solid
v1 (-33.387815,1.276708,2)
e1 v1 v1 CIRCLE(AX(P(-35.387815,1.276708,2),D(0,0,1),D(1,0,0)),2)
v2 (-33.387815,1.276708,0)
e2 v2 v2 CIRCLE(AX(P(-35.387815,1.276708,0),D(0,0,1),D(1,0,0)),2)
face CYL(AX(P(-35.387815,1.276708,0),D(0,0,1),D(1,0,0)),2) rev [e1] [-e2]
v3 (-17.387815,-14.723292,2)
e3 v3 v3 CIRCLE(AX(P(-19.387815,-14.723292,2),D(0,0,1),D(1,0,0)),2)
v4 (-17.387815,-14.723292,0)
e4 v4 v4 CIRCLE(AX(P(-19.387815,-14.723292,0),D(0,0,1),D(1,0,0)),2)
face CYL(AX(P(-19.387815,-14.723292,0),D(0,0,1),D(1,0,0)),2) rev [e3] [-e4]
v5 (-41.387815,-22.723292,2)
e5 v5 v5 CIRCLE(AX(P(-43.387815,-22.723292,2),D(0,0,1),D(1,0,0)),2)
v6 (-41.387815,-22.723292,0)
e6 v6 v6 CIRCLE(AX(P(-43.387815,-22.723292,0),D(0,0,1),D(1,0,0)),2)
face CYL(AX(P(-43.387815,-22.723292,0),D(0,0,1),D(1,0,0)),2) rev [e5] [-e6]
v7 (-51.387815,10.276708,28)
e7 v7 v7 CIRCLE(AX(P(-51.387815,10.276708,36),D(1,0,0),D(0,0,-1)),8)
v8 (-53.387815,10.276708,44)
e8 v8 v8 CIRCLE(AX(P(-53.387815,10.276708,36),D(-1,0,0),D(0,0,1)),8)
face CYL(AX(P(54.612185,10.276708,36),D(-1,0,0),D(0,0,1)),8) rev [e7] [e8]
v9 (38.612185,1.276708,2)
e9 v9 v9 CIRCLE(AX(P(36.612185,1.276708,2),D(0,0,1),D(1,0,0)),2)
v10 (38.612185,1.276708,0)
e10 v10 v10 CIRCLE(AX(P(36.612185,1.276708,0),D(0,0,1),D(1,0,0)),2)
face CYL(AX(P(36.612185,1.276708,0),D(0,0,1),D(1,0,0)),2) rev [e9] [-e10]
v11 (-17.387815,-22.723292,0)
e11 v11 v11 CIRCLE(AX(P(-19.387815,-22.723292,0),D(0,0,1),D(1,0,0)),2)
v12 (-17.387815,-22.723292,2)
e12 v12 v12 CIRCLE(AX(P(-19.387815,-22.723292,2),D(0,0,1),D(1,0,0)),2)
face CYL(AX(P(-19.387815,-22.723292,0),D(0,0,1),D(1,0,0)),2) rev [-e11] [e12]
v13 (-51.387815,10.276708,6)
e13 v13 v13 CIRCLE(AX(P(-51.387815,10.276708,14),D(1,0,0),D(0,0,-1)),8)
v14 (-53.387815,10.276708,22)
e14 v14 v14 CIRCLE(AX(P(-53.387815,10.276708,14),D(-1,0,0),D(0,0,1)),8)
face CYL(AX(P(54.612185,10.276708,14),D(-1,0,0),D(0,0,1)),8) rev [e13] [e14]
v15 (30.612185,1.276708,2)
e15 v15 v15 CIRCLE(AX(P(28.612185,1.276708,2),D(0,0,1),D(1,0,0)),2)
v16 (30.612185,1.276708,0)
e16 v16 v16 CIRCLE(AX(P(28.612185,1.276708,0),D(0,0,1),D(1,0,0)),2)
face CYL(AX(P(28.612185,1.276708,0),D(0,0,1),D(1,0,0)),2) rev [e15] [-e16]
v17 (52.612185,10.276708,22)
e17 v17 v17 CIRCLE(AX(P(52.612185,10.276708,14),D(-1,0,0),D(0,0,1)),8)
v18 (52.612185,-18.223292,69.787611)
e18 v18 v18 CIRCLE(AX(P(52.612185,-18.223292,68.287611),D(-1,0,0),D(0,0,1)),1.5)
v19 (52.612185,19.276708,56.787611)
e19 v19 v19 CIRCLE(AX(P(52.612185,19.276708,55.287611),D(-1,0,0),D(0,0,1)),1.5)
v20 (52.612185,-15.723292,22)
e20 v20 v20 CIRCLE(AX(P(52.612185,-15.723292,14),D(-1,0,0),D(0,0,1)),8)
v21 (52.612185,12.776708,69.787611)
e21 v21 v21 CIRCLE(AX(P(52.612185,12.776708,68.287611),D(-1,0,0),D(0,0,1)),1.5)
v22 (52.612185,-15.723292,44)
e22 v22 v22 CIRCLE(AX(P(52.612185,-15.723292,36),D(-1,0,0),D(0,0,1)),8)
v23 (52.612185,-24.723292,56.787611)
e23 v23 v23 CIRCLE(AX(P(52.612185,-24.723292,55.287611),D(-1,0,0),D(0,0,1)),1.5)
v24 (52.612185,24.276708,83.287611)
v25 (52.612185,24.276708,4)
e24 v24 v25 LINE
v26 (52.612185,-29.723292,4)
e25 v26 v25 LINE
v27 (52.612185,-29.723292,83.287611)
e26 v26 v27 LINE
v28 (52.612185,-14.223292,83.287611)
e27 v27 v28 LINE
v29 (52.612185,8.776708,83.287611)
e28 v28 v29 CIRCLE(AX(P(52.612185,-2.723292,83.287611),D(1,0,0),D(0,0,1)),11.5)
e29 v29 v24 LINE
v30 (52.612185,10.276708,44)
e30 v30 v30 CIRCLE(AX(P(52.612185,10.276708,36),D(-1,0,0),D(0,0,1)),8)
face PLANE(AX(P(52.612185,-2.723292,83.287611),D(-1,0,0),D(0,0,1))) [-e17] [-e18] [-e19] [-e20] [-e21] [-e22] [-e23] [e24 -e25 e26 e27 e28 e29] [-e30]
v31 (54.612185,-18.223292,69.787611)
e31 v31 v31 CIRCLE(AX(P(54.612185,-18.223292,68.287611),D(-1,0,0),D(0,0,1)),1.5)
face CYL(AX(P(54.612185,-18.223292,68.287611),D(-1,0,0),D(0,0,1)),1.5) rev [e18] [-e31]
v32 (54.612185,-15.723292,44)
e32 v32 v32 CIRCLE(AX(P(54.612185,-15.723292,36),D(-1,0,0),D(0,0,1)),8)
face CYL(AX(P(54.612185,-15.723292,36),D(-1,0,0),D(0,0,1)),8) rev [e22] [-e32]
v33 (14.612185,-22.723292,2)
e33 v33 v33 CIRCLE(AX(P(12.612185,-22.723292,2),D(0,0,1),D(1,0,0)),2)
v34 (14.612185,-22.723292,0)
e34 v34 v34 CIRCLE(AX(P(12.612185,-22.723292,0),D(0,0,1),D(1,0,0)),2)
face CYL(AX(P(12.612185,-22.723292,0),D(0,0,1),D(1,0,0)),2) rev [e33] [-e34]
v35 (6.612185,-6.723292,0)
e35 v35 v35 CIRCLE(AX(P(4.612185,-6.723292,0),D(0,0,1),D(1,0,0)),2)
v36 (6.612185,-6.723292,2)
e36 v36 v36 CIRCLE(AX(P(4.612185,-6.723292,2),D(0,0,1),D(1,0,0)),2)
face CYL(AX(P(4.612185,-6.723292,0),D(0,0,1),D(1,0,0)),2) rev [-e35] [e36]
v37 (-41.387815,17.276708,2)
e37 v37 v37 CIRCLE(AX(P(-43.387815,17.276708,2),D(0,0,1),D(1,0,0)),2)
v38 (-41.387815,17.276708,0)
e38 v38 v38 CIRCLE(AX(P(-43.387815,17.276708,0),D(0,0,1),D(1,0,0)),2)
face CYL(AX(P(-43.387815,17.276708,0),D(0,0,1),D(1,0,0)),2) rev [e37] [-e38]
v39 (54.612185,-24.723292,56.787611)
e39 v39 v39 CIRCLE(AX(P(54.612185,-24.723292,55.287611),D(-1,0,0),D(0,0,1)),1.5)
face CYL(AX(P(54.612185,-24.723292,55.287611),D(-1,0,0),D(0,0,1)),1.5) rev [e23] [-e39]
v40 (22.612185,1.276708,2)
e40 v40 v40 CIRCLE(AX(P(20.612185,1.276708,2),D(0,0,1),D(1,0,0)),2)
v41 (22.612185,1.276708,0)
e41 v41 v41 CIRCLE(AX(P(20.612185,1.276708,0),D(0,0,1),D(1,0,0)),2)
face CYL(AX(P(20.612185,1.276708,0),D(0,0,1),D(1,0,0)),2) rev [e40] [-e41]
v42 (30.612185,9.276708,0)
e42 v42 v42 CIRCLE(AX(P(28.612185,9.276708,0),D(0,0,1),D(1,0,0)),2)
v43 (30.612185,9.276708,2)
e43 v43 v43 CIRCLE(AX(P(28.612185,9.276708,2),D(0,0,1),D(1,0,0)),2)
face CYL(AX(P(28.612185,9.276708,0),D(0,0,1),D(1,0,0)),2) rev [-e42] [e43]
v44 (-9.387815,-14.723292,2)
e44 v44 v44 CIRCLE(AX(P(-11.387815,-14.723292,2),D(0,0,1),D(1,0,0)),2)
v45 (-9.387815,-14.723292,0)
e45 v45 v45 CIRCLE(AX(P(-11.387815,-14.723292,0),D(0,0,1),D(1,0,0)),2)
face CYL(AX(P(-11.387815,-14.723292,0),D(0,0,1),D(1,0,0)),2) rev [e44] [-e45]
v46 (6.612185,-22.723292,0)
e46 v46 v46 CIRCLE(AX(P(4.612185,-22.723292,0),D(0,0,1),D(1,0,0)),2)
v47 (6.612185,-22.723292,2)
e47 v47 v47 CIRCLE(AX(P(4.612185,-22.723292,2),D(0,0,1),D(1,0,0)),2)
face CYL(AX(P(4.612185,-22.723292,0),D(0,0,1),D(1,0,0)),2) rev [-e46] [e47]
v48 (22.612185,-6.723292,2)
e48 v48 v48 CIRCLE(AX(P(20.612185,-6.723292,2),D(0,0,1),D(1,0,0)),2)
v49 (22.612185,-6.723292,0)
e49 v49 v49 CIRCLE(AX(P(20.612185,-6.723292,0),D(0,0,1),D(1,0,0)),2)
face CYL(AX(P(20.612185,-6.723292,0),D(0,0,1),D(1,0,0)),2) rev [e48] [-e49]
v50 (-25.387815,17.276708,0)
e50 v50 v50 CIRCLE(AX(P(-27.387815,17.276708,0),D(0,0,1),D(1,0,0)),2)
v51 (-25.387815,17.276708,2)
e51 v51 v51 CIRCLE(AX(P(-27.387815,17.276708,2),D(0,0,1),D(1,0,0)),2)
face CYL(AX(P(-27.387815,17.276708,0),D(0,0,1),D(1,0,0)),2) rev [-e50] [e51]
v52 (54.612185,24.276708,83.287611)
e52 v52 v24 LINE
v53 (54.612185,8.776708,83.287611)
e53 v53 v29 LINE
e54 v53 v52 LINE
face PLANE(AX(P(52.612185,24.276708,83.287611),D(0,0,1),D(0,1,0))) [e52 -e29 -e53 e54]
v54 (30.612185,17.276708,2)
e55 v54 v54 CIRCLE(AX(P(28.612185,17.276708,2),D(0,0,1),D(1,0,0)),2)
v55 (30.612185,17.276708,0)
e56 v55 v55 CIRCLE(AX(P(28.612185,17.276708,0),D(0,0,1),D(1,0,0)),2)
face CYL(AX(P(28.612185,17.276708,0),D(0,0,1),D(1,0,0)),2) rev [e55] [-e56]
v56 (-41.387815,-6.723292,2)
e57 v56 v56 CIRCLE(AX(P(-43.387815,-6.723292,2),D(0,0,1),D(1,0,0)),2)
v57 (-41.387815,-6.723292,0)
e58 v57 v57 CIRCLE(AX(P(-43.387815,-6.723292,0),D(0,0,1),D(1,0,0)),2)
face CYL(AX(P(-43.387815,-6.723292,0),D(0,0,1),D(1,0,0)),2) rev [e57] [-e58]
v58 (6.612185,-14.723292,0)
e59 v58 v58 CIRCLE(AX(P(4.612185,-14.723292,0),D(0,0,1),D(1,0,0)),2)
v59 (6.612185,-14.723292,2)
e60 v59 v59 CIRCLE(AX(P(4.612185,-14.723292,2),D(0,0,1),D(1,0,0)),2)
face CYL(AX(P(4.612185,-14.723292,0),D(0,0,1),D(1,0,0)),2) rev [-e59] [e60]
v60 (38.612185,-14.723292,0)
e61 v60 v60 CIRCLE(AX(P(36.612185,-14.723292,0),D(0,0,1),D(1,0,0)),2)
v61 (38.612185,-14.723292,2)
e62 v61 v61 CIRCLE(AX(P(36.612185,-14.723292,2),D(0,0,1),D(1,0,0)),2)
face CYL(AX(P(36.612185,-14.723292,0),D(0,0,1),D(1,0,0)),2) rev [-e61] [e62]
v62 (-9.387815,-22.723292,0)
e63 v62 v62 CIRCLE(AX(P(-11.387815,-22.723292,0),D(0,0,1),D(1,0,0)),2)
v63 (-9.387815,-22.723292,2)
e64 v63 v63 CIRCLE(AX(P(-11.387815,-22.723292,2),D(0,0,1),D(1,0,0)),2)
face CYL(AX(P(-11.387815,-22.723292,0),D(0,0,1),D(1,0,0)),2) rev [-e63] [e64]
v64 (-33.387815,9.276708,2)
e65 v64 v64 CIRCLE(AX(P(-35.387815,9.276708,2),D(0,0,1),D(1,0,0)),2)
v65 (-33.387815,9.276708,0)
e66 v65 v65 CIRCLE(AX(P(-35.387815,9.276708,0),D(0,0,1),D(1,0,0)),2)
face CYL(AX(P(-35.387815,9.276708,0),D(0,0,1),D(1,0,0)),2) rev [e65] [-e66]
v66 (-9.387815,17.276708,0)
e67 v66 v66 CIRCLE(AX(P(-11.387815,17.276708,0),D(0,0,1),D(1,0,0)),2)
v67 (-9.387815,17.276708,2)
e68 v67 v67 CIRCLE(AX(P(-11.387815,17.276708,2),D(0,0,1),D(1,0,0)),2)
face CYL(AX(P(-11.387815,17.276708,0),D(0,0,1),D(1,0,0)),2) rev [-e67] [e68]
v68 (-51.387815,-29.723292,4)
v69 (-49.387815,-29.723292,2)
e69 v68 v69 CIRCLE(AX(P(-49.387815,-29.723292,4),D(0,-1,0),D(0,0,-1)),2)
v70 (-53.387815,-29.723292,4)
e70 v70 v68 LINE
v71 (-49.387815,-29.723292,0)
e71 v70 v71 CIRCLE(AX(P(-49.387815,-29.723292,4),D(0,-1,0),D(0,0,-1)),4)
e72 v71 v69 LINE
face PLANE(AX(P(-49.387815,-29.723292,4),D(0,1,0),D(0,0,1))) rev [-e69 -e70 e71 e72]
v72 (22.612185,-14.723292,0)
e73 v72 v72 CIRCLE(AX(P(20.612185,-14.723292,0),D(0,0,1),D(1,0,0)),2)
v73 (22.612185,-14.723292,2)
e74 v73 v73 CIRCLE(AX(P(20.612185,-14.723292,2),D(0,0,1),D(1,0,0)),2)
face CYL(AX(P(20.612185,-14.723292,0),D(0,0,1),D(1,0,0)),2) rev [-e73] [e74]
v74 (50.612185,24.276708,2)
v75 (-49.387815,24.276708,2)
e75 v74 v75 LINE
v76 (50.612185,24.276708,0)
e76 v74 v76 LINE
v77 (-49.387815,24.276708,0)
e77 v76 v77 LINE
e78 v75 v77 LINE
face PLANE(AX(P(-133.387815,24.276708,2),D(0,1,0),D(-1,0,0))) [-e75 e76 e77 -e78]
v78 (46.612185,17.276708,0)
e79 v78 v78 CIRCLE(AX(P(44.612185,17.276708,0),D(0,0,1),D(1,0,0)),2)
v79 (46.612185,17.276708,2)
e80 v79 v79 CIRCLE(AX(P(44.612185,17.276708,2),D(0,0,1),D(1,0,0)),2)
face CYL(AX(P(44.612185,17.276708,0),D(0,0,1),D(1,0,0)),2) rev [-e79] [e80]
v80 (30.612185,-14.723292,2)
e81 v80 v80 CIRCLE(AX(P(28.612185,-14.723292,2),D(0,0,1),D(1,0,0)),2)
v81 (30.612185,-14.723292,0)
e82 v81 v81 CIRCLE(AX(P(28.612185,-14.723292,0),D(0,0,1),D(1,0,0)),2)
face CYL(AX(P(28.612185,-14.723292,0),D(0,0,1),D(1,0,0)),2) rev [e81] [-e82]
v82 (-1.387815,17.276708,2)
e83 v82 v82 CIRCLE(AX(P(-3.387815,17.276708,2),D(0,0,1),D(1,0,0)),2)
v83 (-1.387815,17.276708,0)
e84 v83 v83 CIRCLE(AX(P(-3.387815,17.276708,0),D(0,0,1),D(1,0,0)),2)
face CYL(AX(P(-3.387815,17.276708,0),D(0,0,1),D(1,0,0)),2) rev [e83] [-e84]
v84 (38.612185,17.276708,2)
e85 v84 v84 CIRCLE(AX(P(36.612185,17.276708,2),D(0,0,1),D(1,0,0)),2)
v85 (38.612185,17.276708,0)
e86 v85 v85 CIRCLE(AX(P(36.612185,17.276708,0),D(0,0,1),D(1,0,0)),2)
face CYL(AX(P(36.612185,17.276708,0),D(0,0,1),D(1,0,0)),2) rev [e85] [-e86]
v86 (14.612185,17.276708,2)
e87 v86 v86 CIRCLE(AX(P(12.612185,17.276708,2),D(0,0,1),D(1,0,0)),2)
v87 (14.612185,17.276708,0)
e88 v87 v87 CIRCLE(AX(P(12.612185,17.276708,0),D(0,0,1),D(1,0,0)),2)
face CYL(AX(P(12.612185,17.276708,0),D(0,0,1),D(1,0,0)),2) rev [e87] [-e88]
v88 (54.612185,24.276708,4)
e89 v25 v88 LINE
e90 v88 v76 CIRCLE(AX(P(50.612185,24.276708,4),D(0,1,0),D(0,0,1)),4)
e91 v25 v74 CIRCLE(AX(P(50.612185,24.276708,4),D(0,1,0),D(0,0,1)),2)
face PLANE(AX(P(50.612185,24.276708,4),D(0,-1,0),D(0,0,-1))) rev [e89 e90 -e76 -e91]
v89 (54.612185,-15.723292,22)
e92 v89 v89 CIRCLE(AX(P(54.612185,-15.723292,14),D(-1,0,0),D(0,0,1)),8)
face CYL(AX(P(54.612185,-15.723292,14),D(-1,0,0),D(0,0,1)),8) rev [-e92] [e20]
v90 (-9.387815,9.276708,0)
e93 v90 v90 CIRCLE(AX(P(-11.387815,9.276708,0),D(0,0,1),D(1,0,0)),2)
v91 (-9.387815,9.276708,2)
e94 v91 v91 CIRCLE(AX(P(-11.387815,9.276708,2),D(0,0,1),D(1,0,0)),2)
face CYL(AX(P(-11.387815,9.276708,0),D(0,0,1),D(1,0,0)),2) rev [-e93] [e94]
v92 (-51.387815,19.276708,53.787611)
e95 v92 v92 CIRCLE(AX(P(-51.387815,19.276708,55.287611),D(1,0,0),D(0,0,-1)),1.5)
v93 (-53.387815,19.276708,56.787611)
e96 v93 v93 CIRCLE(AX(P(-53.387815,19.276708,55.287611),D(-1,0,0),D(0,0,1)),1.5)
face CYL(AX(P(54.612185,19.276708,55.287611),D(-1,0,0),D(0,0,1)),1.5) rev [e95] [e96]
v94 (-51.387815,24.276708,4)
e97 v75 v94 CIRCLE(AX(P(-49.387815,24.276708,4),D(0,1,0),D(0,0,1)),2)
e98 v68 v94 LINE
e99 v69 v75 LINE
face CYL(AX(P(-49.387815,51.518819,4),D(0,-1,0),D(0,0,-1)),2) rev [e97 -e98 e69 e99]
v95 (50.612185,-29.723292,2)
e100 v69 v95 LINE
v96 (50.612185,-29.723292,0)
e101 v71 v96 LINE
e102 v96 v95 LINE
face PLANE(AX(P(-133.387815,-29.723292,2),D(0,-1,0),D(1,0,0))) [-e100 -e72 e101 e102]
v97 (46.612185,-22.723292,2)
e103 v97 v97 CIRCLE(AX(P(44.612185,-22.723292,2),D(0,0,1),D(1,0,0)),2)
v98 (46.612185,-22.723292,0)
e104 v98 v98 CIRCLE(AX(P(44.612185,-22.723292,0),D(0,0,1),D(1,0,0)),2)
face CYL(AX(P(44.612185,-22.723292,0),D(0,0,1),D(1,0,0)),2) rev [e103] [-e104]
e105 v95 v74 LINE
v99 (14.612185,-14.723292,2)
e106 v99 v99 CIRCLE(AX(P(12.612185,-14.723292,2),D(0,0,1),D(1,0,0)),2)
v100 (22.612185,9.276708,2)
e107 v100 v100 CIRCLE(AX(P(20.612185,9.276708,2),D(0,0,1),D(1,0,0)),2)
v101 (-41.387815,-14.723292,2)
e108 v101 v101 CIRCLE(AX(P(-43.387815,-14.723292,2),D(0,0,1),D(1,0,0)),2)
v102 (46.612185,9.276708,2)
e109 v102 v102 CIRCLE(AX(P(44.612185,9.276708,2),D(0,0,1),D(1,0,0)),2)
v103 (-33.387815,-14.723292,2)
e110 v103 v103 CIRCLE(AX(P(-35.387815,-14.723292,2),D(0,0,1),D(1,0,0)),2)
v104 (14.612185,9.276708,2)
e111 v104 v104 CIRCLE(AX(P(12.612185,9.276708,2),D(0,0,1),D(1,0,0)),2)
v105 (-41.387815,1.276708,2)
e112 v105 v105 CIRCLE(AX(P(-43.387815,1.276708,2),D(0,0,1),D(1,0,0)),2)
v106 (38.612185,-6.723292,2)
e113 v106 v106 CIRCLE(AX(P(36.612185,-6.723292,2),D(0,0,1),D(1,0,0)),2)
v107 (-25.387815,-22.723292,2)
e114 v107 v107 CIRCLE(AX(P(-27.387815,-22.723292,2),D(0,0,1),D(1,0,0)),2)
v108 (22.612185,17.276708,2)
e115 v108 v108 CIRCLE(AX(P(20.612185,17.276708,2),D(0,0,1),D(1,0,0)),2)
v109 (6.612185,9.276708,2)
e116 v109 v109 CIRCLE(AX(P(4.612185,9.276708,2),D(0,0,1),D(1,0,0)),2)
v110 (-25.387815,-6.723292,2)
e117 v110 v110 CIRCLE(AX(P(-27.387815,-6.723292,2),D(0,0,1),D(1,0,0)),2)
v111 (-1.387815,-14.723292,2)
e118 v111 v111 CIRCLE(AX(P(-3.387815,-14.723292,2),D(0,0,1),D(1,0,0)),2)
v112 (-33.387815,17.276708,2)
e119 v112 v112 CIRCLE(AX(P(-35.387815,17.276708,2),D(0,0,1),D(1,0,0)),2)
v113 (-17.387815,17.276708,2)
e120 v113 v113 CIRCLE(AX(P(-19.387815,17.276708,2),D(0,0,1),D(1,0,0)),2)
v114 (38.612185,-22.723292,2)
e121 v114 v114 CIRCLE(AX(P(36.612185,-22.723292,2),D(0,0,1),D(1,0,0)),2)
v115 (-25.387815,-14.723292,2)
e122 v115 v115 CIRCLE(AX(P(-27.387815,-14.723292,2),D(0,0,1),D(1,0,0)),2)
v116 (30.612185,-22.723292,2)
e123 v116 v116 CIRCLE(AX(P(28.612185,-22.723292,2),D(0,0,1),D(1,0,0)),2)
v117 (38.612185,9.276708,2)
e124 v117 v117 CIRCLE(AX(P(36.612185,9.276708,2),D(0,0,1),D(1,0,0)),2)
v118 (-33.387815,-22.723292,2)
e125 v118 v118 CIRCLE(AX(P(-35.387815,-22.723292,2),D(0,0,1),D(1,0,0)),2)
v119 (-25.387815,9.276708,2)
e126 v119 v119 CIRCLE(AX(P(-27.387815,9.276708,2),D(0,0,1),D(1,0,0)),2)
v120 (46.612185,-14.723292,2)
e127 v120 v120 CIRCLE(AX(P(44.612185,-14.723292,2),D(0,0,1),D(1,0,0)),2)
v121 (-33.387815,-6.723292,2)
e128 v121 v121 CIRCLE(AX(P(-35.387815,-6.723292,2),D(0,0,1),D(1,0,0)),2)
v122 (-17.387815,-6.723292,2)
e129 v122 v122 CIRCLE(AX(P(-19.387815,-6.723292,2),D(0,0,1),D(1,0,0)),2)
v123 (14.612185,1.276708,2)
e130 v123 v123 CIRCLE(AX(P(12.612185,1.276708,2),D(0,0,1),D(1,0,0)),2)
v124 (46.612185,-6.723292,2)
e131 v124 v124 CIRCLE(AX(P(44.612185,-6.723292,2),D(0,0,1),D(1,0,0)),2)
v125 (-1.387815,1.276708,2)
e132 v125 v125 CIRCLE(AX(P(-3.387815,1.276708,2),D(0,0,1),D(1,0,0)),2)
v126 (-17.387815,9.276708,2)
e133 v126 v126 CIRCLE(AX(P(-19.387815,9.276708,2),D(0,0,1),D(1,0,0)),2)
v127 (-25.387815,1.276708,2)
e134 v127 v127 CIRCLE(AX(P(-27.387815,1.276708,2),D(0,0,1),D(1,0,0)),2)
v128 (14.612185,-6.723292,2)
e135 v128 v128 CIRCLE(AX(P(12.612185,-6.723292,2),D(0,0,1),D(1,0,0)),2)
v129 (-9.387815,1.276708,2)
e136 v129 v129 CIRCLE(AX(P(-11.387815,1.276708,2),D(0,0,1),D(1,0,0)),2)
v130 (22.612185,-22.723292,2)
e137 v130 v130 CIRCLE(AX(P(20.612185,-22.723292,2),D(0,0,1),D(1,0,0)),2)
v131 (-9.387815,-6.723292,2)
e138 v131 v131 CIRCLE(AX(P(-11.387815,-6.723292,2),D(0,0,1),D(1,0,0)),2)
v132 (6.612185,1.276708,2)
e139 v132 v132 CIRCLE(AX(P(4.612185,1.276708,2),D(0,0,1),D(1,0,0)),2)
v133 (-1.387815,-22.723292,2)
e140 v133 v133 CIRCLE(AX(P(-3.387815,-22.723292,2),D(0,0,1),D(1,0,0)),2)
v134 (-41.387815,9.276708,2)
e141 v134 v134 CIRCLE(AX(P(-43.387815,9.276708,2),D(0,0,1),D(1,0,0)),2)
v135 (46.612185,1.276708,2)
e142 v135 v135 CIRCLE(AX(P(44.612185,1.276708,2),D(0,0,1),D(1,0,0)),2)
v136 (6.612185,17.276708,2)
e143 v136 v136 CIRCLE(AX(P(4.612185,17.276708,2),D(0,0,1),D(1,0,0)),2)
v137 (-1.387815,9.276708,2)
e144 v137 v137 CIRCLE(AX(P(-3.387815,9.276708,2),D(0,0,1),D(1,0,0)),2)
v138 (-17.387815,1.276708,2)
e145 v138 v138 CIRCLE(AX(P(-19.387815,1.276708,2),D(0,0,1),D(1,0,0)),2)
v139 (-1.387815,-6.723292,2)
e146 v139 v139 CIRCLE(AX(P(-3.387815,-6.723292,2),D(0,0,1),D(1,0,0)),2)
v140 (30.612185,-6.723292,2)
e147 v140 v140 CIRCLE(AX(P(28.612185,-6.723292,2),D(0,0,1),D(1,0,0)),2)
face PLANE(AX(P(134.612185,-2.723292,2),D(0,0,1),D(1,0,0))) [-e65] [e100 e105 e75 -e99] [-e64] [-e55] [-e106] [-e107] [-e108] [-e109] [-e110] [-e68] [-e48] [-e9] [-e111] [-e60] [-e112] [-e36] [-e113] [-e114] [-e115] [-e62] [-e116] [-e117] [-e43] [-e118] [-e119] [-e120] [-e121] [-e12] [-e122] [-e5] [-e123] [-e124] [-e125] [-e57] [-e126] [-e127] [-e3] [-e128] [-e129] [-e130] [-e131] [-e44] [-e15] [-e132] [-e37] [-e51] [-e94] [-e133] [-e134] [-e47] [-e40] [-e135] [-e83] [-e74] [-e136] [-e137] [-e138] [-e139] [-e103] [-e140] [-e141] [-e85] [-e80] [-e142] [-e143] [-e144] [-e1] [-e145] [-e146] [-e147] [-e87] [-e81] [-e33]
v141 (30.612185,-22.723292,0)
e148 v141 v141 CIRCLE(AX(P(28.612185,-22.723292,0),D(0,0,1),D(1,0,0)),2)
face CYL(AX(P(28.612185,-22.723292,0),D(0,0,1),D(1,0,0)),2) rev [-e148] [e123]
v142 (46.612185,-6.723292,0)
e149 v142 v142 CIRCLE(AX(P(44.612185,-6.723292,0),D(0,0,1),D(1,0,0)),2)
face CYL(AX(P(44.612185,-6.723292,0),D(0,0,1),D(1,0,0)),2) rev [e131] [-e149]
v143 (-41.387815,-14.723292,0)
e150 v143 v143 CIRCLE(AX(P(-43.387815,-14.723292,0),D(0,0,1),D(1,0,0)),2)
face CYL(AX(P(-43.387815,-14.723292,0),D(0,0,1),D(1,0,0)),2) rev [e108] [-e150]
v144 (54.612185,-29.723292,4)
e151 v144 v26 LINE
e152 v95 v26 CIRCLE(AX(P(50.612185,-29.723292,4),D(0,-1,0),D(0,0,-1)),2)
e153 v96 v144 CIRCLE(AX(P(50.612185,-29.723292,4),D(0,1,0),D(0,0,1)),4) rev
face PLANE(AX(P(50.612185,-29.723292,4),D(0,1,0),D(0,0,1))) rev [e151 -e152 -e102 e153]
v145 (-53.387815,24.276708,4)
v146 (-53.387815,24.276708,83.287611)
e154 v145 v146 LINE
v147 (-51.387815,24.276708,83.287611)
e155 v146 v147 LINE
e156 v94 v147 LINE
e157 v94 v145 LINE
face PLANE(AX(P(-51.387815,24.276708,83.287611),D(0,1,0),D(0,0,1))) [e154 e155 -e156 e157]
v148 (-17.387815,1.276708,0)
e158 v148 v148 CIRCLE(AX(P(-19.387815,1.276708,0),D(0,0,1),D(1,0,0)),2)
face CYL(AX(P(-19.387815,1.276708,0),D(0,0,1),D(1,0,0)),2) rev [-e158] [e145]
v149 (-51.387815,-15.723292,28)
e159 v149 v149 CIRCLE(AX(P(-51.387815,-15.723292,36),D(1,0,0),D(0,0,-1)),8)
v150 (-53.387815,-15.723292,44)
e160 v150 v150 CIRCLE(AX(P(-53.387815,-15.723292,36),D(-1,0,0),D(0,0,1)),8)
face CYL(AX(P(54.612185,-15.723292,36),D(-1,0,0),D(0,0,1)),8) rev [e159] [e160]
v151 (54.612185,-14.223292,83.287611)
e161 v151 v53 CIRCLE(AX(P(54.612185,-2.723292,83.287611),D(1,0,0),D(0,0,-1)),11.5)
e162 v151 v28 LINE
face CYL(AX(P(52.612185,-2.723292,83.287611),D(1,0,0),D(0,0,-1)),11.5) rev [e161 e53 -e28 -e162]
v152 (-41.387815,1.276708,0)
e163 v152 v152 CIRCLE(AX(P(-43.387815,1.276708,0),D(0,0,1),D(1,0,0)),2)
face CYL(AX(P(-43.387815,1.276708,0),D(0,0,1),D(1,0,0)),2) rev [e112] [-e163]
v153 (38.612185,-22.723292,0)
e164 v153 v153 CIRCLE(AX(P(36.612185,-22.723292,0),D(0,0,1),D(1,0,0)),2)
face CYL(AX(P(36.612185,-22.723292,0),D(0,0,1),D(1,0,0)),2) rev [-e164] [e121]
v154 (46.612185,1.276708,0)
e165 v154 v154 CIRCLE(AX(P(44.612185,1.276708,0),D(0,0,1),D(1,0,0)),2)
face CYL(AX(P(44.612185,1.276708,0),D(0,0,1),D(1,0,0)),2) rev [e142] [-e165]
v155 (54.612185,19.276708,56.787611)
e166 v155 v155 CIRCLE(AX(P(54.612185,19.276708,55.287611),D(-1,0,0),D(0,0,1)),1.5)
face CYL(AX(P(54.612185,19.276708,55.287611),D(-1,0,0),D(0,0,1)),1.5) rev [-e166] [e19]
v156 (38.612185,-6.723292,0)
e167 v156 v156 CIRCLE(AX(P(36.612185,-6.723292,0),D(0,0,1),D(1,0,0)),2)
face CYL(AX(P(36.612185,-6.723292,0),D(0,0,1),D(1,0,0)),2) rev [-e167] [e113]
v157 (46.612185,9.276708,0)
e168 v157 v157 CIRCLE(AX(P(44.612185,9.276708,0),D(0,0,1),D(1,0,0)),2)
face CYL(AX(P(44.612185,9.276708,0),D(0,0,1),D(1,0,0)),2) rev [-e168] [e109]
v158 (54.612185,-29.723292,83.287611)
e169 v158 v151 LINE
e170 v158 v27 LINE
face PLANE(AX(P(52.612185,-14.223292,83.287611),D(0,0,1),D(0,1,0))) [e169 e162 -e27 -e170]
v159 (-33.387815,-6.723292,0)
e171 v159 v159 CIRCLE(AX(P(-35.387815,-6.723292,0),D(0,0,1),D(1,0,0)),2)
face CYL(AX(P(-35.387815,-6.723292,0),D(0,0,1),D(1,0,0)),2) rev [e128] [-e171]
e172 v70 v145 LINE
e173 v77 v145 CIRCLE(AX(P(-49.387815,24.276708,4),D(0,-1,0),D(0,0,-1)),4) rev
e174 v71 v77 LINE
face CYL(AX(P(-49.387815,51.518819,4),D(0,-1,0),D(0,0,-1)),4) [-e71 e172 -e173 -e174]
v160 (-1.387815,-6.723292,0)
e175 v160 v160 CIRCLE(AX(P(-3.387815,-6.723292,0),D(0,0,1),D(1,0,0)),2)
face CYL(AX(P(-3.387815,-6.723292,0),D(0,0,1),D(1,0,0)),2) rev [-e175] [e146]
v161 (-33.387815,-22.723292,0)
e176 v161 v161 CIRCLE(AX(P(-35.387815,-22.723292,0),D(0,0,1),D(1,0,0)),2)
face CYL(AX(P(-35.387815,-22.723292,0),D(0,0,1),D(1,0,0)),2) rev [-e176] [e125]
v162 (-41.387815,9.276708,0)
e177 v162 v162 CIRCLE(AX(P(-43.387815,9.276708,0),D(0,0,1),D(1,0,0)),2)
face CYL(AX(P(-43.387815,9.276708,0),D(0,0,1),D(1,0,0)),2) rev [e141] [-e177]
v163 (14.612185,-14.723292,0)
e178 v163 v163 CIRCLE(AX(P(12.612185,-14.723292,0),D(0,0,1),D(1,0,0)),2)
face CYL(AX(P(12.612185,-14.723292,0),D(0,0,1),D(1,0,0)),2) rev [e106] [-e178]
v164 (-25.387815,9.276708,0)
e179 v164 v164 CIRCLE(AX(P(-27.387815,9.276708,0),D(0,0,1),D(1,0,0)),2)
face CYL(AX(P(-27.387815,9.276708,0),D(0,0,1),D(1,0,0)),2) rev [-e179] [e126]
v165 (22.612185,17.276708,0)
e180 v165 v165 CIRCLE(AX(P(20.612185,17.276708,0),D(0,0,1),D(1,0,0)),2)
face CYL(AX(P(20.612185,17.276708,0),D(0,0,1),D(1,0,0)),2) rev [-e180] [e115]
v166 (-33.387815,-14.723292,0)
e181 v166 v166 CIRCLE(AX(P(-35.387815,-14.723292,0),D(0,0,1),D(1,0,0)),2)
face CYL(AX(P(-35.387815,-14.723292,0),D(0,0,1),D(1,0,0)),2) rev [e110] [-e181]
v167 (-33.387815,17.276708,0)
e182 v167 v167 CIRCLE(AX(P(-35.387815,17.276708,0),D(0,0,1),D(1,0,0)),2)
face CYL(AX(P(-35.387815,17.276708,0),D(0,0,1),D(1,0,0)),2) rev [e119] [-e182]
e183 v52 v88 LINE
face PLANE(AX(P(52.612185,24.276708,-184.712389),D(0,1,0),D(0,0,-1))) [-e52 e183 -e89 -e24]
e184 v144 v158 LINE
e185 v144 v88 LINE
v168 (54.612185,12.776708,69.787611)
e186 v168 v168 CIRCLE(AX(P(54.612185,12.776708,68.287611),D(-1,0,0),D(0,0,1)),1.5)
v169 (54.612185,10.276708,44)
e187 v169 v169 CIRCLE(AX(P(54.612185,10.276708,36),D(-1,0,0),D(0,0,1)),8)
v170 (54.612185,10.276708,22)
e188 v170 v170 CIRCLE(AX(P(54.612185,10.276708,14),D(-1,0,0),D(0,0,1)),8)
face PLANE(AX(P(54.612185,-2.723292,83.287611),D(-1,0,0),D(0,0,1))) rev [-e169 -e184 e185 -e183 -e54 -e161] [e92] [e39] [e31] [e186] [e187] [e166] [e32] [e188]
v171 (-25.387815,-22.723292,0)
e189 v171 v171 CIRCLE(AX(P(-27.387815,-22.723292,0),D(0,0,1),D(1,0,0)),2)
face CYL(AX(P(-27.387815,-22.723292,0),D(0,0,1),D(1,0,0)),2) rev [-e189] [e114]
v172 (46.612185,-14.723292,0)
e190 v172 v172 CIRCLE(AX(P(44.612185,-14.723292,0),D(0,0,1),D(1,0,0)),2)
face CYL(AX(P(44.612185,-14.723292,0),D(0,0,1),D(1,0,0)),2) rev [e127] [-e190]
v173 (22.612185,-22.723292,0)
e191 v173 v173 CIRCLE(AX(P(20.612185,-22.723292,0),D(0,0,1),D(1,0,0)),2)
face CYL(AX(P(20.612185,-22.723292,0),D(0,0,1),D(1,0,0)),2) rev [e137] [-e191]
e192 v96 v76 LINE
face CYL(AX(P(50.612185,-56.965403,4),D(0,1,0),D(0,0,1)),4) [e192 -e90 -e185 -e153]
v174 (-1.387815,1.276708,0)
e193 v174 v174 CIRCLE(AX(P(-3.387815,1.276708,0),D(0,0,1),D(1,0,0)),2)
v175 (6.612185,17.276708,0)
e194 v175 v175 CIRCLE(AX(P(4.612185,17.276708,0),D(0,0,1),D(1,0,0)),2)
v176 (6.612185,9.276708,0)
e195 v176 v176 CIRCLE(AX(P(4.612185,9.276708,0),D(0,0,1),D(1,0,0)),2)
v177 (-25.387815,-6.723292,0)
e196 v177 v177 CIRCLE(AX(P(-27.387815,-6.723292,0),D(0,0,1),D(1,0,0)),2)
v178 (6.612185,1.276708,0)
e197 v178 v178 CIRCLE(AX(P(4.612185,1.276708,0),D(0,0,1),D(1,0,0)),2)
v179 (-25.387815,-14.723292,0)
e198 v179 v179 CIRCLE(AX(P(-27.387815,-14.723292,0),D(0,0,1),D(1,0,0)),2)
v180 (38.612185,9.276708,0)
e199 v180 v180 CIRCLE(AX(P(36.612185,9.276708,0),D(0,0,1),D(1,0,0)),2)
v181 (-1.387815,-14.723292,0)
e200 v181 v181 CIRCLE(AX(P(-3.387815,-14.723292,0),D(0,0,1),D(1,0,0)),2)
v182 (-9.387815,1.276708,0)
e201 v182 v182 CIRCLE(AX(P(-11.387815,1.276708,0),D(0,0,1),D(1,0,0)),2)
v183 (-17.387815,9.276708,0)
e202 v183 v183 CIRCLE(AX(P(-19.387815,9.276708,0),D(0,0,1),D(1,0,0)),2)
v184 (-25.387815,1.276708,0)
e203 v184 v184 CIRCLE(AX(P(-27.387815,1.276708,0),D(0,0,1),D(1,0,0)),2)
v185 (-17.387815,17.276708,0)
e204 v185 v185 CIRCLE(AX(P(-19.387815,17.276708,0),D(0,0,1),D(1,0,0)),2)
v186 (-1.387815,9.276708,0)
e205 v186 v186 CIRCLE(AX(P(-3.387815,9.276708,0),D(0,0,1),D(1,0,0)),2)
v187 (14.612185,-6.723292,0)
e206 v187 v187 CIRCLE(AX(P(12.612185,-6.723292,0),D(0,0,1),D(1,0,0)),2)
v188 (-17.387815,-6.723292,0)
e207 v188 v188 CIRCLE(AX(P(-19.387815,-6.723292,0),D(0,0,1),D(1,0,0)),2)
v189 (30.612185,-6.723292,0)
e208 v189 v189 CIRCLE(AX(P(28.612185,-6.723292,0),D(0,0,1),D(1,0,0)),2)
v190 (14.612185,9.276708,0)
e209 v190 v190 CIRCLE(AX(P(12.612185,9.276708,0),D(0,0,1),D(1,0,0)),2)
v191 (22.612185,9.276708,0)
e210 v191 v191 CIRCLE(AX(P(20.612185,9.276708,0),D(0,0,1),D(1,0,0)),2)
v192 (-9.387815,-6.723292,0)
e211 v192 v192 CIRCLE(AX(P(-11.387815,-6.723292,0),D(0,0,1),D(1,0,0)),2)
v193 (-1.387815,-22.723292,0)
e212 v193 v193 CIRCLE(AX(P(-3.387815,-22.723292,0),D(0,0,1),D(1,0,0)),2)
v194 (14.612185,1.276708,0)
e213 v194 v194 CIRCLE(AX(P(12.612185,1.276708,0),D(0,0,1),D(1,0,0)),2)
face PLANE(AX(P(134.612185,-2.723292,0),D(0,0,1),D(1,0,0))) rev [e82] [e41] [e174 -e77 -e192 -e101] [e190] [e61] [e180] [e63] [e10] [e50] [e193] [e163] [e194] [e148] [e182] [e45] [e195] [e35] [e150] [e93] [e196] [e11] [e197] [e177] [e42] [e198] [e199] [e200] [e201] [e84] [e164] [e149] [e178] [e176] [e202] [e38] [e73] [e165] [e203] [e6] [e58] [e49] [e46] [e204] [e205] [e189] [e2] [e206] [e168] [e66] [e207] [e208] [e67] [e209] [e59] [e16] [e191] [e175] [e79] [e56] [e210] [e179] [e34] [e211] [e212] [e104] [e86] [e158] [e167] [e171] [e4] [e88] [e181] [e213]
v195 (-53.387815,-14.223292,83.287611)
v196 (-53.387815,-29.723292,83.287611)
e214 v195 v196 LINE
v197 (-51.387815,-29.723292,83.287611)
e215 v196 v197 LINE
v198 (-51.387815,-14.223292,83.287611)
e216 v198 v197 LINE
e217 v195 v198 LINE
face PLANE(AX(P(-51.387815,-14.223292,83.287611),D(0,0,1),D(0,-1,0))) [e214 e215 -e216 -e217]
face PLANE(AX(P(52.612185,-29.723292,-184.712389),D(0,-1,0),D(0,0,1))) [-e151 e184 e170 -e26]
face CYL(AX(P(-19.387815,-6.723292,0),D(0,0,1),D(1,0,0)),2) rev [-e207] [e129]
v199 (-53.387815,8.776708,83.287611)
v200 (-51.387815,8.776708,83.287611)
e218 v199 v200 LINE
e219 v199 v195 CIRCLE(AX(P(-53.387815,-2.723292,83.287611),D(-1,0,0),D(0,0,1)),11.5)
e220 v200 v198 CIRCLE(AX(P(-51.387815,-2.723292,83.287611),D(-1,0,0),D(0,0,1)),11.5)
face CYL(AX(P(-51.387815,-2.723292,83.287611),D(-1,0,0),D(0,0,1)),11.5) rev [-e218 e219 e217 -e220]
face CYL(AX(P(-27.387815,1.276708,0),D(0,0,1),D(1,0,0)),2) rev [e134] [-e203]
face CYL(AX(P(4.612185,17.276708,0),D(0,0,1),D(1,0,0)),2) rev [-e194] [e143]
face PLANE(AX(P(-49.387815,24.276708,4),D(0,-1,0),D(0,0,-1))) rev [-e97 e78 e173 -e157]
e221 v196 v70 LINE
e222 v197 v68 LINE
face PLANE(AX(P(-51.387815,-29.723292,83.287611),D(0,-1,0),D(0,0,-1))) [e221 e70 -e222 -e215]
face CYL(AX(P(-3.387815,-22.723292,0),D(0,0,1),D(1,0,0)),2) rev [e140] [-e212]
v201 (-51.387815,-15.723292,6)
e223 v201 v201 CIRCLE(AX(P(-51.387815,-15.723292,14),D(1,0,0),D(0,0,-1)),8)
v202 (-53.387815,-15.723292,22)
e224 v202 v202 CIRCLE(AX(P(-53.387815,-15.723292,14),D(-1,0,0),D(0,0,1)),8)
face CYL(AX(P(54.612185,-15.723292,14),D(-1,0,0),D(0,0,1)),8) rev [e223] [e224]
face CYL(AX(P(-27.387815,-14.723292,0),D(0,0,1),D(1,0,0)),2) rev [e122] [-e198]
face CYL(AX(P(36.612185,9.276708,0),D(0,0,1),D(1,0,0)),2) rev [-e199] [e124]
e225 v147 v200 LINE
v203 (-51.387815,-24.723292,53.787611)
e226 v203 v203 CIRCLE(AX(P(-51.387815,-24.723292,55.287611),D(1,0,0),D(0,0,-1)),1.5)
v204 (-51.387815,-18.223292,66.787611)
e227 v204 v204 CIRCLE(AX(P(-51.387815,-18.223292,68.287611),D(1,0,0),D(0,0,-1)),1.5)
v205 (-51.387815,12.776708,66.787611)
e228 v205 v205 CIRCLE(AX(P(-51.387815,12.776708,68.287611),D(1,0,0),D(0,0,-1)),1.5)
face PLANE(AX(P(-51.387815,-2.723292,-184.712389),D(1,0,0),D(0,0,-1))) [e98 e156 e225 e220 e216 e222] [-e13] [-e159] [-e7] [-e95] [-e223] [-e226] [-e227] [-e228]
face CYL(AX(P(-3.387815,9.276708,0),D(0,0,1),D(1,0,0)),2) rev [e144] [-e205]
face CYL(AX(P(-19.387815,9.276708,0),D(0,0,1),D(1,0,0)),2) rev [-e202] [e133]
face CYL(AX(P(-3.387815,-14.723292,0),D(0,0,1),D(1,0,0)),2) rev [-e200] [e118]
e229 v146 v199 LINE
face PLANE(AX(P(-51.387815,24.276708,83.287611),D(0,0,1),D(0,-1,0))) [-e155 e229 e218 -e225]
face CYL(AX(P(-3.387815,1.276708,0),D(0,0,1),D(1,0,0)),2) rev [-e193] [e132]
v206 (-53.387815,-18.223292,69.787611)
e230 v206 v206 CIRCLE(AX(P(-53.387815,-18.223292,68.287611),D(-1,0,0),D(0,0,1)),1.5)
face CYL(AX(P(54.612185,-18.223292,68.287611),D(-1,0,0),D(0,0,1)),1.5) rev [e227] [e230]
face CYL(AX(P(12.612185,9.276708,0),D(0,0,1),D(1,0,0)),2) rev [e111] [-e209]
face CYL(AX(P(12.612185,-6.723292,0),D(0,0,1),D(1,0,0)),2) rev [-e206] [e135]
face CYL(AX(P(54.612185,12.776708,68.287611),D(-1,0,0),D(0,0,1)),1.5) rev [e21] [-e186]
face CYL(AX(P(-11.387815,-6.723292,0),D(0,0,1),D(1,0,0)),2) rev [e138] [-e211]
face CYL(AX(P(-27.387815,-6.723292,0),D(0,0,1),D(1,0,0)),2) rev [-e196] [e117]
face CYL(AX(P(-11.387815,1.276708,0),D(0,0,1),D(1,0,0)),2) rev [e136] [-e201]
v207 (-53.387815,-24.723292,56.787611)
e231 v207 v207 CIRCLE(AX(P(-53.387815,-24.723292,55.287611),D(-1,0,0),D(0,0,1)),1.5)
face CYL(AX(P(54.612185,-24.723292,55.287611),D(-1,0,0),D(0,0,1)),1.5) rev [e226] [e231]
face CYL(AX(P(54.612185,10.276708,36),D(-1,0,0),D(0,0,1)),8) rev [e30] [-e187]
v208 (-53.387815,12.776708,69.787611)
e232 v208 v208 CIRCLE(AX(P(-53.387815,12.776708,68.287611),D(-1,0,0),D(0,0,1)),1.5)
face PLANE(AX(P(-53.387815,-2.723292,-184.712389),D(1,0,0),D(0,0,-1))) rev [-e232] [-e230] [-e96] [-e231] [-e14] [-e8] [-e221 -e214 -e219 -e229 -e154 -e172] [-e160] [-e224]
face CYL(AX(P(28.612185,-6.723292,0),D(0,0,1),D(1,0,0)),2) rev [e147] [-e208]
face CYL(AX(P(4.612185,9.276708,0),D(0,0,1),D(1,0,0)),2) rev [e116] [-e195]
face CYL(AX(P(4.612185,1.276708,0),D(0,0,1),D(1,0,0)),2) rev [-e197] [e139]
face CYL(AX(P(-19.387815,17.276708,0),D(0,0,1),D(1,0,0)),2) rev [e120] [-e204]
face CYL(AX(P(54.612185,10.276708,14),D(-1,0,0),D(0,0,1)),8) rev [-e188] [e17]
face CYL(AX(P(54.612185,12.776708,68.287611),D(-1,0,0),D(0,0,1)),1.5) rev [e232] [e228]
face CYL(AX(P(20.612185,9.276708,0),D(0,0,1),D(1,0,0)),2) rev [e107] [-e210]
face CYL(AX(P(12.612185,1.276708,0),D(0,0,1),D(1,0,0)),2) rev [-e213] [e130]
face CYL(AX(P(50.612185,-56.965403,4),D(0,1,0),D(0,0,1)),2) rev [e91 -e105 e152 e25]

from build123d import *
from build123d.topology import SkipClean

# Parameters (mm, degrees)
DODANIE_WYCI_GNI_CIE2_DEPTH = 2
SZKIC_START                 = -29.723292371
SZKIC_ZGI_CIA2_DEPTH        = 54
SZKIC_ZGI_CIA2_2_DEPTH      = 54
SZKIC_START_2               = -53.387814563
SZKIC_ZGI_CIA2_3_DEPTH      = 2
SZKIC_ZGI_CIA3_DEPTH        = 54
SZKIC_ZGI_CIA3_2_DEPTH      = 15.5
SZKIC_START_3               = 8.776707629
SZKIC_ZGI_CIA3_3_DEPTH      = 15.5
SZKIC_START_4               = 50.91654951
SZKIC_ZGI_CIA3_4_DEPTH      = 3.695635927
SZKIC_START_5               = -14.223292371
SZKIC_ZGI_CIA3_5_DEPTH      = 23
SZKIC_ZGI_CIA3_6_DEPTH      = 23
SZKIC15_R                   = 2
WYTNIJ_WYCI_GNI_CIE1_DEPTH  = 103.340806205
SZKIC17_R                   = 8
WYTNIJ_WYCI_GNI_CIE2_DEPTH  = 140.586175041
SZKIC18_R                   = 1.5
WYTNIJ_WYCI_GNI_CIE3_DEPTH  = 140.586175041


with BuildPart() as part:
    # Szkic1 → Dodanie-wyciągnięcie2 (new body)
    with BuildSketch(Plane.XY):
        with BuildLine():
            Line((-133.387814563, 24.276707629), (-133.387814563, 8.776707629))
            ThreePointArc((-133.387814563, 8.776707629), (-121.887814563, -2.723292371), (-133.387814563, -14.223292371))
            Line((-133.387814563, -14.223292371), (-133.387814563, -29.723292371))
            Line((-133.387814563, -29.723292371), (134.612185437, -29.723292371))
            Line((134.612185437, -29.723292371), (134.612185437, -14.223292371))
            ThreePointArc((134.612185437, -14.223292371), (123.112185437, -2.723292371), (134.612185437, 8.776707629))
            Line((134.612185437, 8.776707629), (134.612185437, 24.276707629))
            Line((134.612185437, 24.276707629), (-133.387814563, 24.276707629))
        make_face()
    extrude(amount=DODANIE_WYCI_GNI_CIE2_DEPTH)

    # Szkic zgięcia2: read off the stored shape, not the designer's step
    # Szkic zgięcia2 outline → Szkic zgięcia2 (cut)
    with BuildSketch(Plane(origin=(0, 0, 0), x_dir=(1, 0, 0), z_dir=(0, 1, 0)).offset(SZKIC_START)):
        with BuildLine():
            Line((-133.387814563, -2), (-52.851916179, -2))
            ThreePointArc((-52.851916179, -2), (-51.387814563, -0.535898385), (-49.387814563, 0))
            Line((-49.387814563, 0), (-133.387814563, 0))
            Line((-133.387814563, 0), (-133.387814563, -2))
        make_face()
    extrude(amount=SZKIC_ZGI_CIA2_DEPTH, mode=Mode.SUBTRACT)

    # Szkic zgi_cia2 2 outline → Szkic zgi_cia2 2 (add)
    with BuildSketch(Plane(origin=(0, 0, 0), x_dir=(1, 0, 0), z_dir=(0, 1, 0)).offset(SZKIC_START)):
        with BuildLine():
            Line((-53.387814563, -83.28761102), (-51.387814563, -83.28761102))
            Line((-51.387814563, -83.28761102), (-51.387814563, -4))
            ThreePointArc((-51.387814563, -4), (-50.802028126, -2.585786437), (-49.387814563, -2))
            Line((-49.387814563, -2), (-52.851916179, -2))
            ThreePointArc((-52.851916179, -2), (-53.251517868, -2.96472382), (-53.387814563, -4))
            Line((-53.387814563, -4), (-53.387814563, -83.28761102))
        make_face()
    extrude(amount=SZKIC_ZGI_CIA2_2_DEPTH)

    # Szkic zgi_cia2 3 outline → Szkic zgi_cia2 3 (cut)
    with BuildSketch(Plane.YZ.offset(SZKIC_START_2)):
        with BuildLine():
            ThreePointArc((-14.223292371, 83.28761102), (-2.723292371, 71.78761102), (8.776707629, 83.28761102))
            Line((8.776707629, 83.28761102), (-14.223292371, 83.28761102))
        make_face()
    extrude(amount=SZKIC_ZGI_CIA2_3_DEPTH, mode=Mode.SUBTRACT)

    # Szkic zgięcia3: read off the stored shape, not the designer's step
    # Szkic zgięcia3 outline → Szkic zgięcia3 (cut)
    with BuildSketch(Plane(origin=(0, 0, 0), x_dir=(1, 0, 0), z_dir=(0, 1, 0)).offset(SZKIC_START)):
        with BuildLine():
            ThreePointArc((50.612185437, 0), (52.612185437, -0.535898385), (54.076287052, -2))
            Line((54.076287052, -2), (134.612185437, -2))
            Line((134.612185437, -2), (134.612185437, 0))
            Line((134.612185437, 0), (50.612185437, 0))
        make_face()
    extrude(amount=SZKIC_ZGI_CIA3_DEPTH, mode=Mode.SUBTRACT)

    # Szkic zgi_cia3 2 outline → Szkic zgi_cia3 2 (add)
    with BuildSketch(Plane(origin=(0, 0, 0), x_dir=(1, 0, 0), z_dir=(0, 1, 0)).offset(SZKIC_START)):
        with BuildLine():
            Line((52.612185437, -4), (52.612185437, -83.28761102))
            Line((52.612185437, -83.28761102), (54.612185437, -83.28761102))
            Line((54.612185437, -83.28761102), (54.612185437, -4))
            ThreePointArc((54.612185437, -4), (54.475888742, -2.96472382), (54.076287052, -2))
            Line((54.076287052, -2), (50.612185437, -2))
            ThreePointArc((50.612185437, -2), (52.026398999, -2.585786438), (52.612185437, -4))
        make_face()
    extrude(amount=SZKIC_ZGI_CIA3_2_DEPTH)

    # Szkic zgi_cia3 3 outline → Szkic zgi_cia3 3 (add)
    with BuildSketch(Plane(origin=(0, 0, 0), x_dir=(1, 0, 0), z_dir=(0, 1, 0)).offset(SZKIC_START_3)):
        with BuildLine():
            Line((52.612185437, -4), (52.612185437, -83.28761102))
            Line((52.612185437, -83.28761102), (54.612185437, -83.28761102))
            Line((54.612185437, -83.28761102), (54.612185437, -4))
            ThreePointArc((54.612185437, -4), (54.475888742, -2.96472382), (54.076287052, -2))
            Line((54.076287052, -2), (50.612185437, -2))
            ThreePointArc((50.612185437, -2), (52.026398999, -2.585786438), (52.612185437, -4))
        make_face()
    extrude(amount=SZKIC_ZGI_CIA3_3_DEPTH)

    # Szkic zgi_cia3 4 outline → Szkic zgi_cia3 4 (add)
    with BuildSketch(Plane.YZ.offset(SZKIC_START_4)):
        with BuildLine():
            ThreePointArc((8.776707629, 83.28761102), (-2.723292371, 71.78761102), (-14.223292371, 83.28761102))
            Line((-14.223292371, 83.28761102), (-14.223292371, 2))
            Line((-14.223292371, 2), (8.776707629, 2))
            Line((8.776707629, 2), (8.776707629, 83.28761102))
        make_face()
    extrude(amount=SZKIC_ZGI_CIA3_4_DEPTH)

    # Szkic zgi_cia3 5 outline → Szkic zgi_cia3 5 (cut)
    with SkipClean():  # the faces are left unmerged after this step: merging them gives an invalid solid
        with BuildSketch(Plane(origin=(0, 0, 0), x_dir=(1, 0, 0), z_dir=(0, 1, 0)).offset(SZKIC_START_5)):
            with BuildLine():
                Line((52.612185437, -85), (52.612185437, -4))
                ThreePointArc((52.612185437, -4), (52.130198636, -2.69783414), (50.91654951, -2.023295037))
                Line((50.91654951, -2.023295037), (50.91654951, -85))
                Line((50.91654951, -85), (52.612185437, -85))
            make_face()
            with BuildLine():
                Line((56, -2), (54.076287052, -2))
                ThreePointArc((54.076287052, -2), (54.475888742, -2.96472382), (54.612185437, -4))
                Line((54.612185437, -4), (54.612185454, -85))
                Line((54.612185454, -85), (56, -85))
                Line((56, -85), (56, -2))
            make_face()
        extrude(amount=SZKIC_ZGI_CIA3_5_DEPTH, mode=Mode.SUBTRACT)

    # Szkic zgi_cia3 6 outline → Szkic zgi_cia3 6 (add)
    with SkipClean():  # the faces are left unmerged after this step: merging them gives an invalid solid
        with BuildSketch(Plane(origin=(0, 0, 0), x_dir=(1, 0, 0), z_dir=(0, 1, 0)).offset(SZKIC_START_5)):
            with BuildLine():
                ThreePointArc((50.612185437, -2), (50.764812554, -2.005832263), (50.91654951, -2.023295037))
                Line((50.91654951, -2.023295037), (50.91654951, -2))
                Line((50.91654951, -2), (50.612185437, -2))
            make_face()
        extrude(amount=SZKIC_ZGI_CIA3_6_DEPTH)

    # Szkic15 → Wytnij-wyciągnięcie1 (cut, through all)
    with SkipClean():  # the faces are left unmerged after this step: merging them gives an invalid solid
        with BuildSketch(Plane.XY.offset(2)):
            with Locations((-43.387814563, 17.276707629)):
                Circle(SZKIC15_R)
            with Locations((-35.387814563, 17.276707629)):
                Circle(SZKIC15_R)
            with Locations((-27.387814563, 17.276707629)):
                Circle(SZKIC15_R)
            with Locations((-19.387814563, 17.276707629)):
                Circle(SZKIC15_R)
            with Locations((-11.387814563, 17.276707629)):
                Circle(SZKIC15_R)
            with Locations((-3.387814563, 17.276707629)):
                Circle(SZKIC15_R)
            with Locations((4.612185437, 17.276707629)):
                Circle(SZKIC15_R)
            with Locations((12.612185437, 17.276707629)):
                Circle(SZKIC15_R)
            with Locations((20.612185437, 17.276707629)):
                Circle(SZKIC15_R)
            with Locations((28.612185437, 17.276707629)):
                Circle(SZKIC15_R)
            with Locations((36.612185437, 17.276707629)):
                Circle(SZKIC15_R)
            with Locations((44.612185437, 17.276707629)):
                Circle(SZKIC15_R)
            with Locations((-35.387814563, 9.276707629)):
                Circle(SZKIC15_R)
            with Locations((-27.387814563, 9.276707629)):
                Circle(SZKIC15_R)
            with Locations((-19.387814563, 9.276707629)):
                Circle(SZKIC15_R)
            with Locations((-11.387814563, 9.276707629)):
                Circle(SZKIC15_R)
            with Locations((-3.387814563, 9.276707629)):
                Circle(SZKIC15_R)
            with Locations((4.612185437, 9.276707629)):
                Circle(SZKIC15_R)
            with Locations((12.612185437, 9.276707629)):
                Circle(SZKIC15_R)
            with Locations((20.612185437, 9.276707629)):
                Circle(SZKIC15_R)
            with Locations((28.612185437, 9.276707629)):
                Circle(SZKIC15_R)
            with Locations((36.612185437, 9.276707629)):
                Circle(SZKIC15_R)
            with Locations((44.612185437, 9.276707629)):
                Circle(SZKIC15_R)
            with Locations((-35.387814563, 1.276707629)):
                Circle(SZKIC15_R)
            with Locations((-27.387814563, 1.276707629)):
                Circle(SZKIC15_R)
            with Locations((-19.387814563, 1.276707629)):
                Circle(SZKIC15_R)
            with Locations((-11.387814563, 1.276707629)):
                Circle(SZKIC15_R)
            with Locations((-3.387814563, 1.276707629)):
                Circle(SZKIC15_R)
            with Locations((4.612185437, 1.276707629)):
                Circle(SZKIC15_R)
            with Locations((12.612185437, 1.276707629)):
                Circle(SZKIC15_R)
            with Locations((20.612185437, 1.276707629)):
                Circle(SZKIC15_R)
            with Locations((28.612185437, 1.276707629)):
                Circle(SZKIC15_R)
            with Locations((36.612185437, 1.276707629)):
                Circle(SZKIC15_R)
            with Locations((44.612185437, 1.276707629)):
                Circle(SZKIC15_R)
            with Locations((-35.387814563, -6.723292371)):
                Circle(SZKIC15_R)
            with Locations((-27.387814563, -6.723292371)):
                Circle(SZKIC15_R)
            with Locations((-19.387814563, -6.723292371)):
                Circle(SZKIC15_R)
            with Locations((-11.387814563, -6.723292371)):
                Circle(SZKIC15_R)
            with Locations((-3.387814563, -6.723292371)):
                Circle(SZKIC15_R)
            with Locations((4.612185437, -6.723292371)):
                Circle(SZKIC15_R)
            with Locations((12.612185437, -6.723292371)):
                Circle(SZKIC15_R)
            with Locations((20.612185437, -6.723292371)):
                Circle(SZKIC15_R)
            with Locations((28.612185437, -6.723292371)):
                Circle(SZKIC15_R)
            with Locations((36.612185437, -6.723292371)):
                Circle(SZKIC15_R)
            with Locations((44.612185437, -6.723292371)):
                Circle(SZKIC15_R)
            with Locations((-35.387814563, -14.723292371)):
                Circle(SZKIC15_R)
            with Locations((-27.387814563, -14.723292371)):
                Circle(SZKIC15_R)
            with Locations((-19.387814563, -14.723292371)):
                Circle(SZKIC15_R)
            with Locations((-11.387814563, -14.723292371)):
                Circle(SZKIC15_R)
            with Locations((-3.387814563, -14.723292371)):
                Circle(SZKIC15_R)
            with Locations((4.612185437, -14.723292371)):
                Circle(SZKIC15_R)
            with Locations((12.612185437, -14.723292371)):
                Circle(SZKIC15_R)
            with Locations((20.612185437, -14.723292371)):
                Circle(SZKIC15_R)
            with Locations((28.612185437, -14.723292371)):
                Circle(SZKIC15_R)
            with Locations((36.612185437, -14.723292371)):
                Circle(SZKIC15_R)
            with Locations((44.612185437, -14.723292371)):
                Circle(SZKIC15_R)
            with Locations((-35.387814563, -22.723292371)):
                Circle(SZKIC15_R)
            with Locations((-27.387814563, -22.723292371)):
                Circle(SZKIC15_R)
            with Locations((-19.387814563, -22.723292371)):
                Circle(SZKIC15_R)
            with Locations((-11.387814563, -22.723292371)):
                Circle(SZKIC15_R)
            with Locations((-3.387814563, -22.723292371)):
                Circle(SZKIC15_R)
            with Locations((4.612185437, -22.723292371)):
                Circle(SZKIC15_R)
            with Locations((12.612185437, -22.723292371)):
                Circle(SZKIC15_R)
            with Locations((20.612185437, -22.723292371)):
                Circle(SZKIC15_R)
            with Locations((28.612185437, -22.723292371)):
                Circle(SZKIC15_R)
            with Locations((36.612185437, -22.723292371)):
                Circle(SZKIC15_R)
            with Locations((44.612185437, -22.723292371)):
                Circle(SZKIC15_R)
            with Locations((-43.387814563, 9.276707629)):
                Circle(SZKIC15_R)
            with Locations((-43.387814563, 1.276707629)):
                Circle(SZKIC15_R)
            with Locations((-43.387814563, -6.723292371)):
                Circle(SZKIC15_R)
            with Locations((-43.387814563, -14.723292371)):
                Circle(SZKIC15_R)
            with Locations((-43.387814563, -22.723292371)):
                Circle(SZKIC15_R)
        extrude(amount=-WYTNIJ_WYCI_GNI_CIE1_DEPTH, mode=Mode.SUBTRACT)

    # Szkic17 → Wytnij-wyciągnięcie2 (cut, through all)
    with SkipClean():  # the faces are left unmerged after this step: merging them gives an invalid solid
        with BuildSketch(Plane.ZY.offset(53.387814563)):
            with Locations((14, 10.276707629)):
                Circle(SZKIC17_R)
            with Locations((36, 10.276707629)):
                Circle(SZKIC17_R)
            with Locations((36, -15.723292371)):
                Circle(SZKIC17_R)
            with Locations((14, -15.723292371)):
                Circle(SZKIC17_R)
        extrude(amount=-WYTNIJ_WYCI_GNI_CIE2_DEPTH, mode=Mode.SUBTRACT)

    # Szkic18 → Wytnij-wyciągnięcie3 (cut, through all)
    with SkipClean():  # the faces are left unmerged after this step: merging them gives an invalid solid
        with BuildSketch(Plane.ZY.offset(53.387814563)):
            with Locations((68.28761102, 12.776707629)):
                Circle(SZKIC18_R)
            with Locations((68.28761102, -18.223292371)):
                Circle(SZKIC18_R)
            with Locations((55.28761102, 19.276707629)):
                Circle(SZKIC18_R)
            with Locations((55.28761102, -24.723292371)):
                Circle(SZKIC18_R)
        extrude(amount=-WYTNIJ_WYCI_GNI_CIE3_DEPTH, mode=Mode.SUBTRACT)


solid = part.part
